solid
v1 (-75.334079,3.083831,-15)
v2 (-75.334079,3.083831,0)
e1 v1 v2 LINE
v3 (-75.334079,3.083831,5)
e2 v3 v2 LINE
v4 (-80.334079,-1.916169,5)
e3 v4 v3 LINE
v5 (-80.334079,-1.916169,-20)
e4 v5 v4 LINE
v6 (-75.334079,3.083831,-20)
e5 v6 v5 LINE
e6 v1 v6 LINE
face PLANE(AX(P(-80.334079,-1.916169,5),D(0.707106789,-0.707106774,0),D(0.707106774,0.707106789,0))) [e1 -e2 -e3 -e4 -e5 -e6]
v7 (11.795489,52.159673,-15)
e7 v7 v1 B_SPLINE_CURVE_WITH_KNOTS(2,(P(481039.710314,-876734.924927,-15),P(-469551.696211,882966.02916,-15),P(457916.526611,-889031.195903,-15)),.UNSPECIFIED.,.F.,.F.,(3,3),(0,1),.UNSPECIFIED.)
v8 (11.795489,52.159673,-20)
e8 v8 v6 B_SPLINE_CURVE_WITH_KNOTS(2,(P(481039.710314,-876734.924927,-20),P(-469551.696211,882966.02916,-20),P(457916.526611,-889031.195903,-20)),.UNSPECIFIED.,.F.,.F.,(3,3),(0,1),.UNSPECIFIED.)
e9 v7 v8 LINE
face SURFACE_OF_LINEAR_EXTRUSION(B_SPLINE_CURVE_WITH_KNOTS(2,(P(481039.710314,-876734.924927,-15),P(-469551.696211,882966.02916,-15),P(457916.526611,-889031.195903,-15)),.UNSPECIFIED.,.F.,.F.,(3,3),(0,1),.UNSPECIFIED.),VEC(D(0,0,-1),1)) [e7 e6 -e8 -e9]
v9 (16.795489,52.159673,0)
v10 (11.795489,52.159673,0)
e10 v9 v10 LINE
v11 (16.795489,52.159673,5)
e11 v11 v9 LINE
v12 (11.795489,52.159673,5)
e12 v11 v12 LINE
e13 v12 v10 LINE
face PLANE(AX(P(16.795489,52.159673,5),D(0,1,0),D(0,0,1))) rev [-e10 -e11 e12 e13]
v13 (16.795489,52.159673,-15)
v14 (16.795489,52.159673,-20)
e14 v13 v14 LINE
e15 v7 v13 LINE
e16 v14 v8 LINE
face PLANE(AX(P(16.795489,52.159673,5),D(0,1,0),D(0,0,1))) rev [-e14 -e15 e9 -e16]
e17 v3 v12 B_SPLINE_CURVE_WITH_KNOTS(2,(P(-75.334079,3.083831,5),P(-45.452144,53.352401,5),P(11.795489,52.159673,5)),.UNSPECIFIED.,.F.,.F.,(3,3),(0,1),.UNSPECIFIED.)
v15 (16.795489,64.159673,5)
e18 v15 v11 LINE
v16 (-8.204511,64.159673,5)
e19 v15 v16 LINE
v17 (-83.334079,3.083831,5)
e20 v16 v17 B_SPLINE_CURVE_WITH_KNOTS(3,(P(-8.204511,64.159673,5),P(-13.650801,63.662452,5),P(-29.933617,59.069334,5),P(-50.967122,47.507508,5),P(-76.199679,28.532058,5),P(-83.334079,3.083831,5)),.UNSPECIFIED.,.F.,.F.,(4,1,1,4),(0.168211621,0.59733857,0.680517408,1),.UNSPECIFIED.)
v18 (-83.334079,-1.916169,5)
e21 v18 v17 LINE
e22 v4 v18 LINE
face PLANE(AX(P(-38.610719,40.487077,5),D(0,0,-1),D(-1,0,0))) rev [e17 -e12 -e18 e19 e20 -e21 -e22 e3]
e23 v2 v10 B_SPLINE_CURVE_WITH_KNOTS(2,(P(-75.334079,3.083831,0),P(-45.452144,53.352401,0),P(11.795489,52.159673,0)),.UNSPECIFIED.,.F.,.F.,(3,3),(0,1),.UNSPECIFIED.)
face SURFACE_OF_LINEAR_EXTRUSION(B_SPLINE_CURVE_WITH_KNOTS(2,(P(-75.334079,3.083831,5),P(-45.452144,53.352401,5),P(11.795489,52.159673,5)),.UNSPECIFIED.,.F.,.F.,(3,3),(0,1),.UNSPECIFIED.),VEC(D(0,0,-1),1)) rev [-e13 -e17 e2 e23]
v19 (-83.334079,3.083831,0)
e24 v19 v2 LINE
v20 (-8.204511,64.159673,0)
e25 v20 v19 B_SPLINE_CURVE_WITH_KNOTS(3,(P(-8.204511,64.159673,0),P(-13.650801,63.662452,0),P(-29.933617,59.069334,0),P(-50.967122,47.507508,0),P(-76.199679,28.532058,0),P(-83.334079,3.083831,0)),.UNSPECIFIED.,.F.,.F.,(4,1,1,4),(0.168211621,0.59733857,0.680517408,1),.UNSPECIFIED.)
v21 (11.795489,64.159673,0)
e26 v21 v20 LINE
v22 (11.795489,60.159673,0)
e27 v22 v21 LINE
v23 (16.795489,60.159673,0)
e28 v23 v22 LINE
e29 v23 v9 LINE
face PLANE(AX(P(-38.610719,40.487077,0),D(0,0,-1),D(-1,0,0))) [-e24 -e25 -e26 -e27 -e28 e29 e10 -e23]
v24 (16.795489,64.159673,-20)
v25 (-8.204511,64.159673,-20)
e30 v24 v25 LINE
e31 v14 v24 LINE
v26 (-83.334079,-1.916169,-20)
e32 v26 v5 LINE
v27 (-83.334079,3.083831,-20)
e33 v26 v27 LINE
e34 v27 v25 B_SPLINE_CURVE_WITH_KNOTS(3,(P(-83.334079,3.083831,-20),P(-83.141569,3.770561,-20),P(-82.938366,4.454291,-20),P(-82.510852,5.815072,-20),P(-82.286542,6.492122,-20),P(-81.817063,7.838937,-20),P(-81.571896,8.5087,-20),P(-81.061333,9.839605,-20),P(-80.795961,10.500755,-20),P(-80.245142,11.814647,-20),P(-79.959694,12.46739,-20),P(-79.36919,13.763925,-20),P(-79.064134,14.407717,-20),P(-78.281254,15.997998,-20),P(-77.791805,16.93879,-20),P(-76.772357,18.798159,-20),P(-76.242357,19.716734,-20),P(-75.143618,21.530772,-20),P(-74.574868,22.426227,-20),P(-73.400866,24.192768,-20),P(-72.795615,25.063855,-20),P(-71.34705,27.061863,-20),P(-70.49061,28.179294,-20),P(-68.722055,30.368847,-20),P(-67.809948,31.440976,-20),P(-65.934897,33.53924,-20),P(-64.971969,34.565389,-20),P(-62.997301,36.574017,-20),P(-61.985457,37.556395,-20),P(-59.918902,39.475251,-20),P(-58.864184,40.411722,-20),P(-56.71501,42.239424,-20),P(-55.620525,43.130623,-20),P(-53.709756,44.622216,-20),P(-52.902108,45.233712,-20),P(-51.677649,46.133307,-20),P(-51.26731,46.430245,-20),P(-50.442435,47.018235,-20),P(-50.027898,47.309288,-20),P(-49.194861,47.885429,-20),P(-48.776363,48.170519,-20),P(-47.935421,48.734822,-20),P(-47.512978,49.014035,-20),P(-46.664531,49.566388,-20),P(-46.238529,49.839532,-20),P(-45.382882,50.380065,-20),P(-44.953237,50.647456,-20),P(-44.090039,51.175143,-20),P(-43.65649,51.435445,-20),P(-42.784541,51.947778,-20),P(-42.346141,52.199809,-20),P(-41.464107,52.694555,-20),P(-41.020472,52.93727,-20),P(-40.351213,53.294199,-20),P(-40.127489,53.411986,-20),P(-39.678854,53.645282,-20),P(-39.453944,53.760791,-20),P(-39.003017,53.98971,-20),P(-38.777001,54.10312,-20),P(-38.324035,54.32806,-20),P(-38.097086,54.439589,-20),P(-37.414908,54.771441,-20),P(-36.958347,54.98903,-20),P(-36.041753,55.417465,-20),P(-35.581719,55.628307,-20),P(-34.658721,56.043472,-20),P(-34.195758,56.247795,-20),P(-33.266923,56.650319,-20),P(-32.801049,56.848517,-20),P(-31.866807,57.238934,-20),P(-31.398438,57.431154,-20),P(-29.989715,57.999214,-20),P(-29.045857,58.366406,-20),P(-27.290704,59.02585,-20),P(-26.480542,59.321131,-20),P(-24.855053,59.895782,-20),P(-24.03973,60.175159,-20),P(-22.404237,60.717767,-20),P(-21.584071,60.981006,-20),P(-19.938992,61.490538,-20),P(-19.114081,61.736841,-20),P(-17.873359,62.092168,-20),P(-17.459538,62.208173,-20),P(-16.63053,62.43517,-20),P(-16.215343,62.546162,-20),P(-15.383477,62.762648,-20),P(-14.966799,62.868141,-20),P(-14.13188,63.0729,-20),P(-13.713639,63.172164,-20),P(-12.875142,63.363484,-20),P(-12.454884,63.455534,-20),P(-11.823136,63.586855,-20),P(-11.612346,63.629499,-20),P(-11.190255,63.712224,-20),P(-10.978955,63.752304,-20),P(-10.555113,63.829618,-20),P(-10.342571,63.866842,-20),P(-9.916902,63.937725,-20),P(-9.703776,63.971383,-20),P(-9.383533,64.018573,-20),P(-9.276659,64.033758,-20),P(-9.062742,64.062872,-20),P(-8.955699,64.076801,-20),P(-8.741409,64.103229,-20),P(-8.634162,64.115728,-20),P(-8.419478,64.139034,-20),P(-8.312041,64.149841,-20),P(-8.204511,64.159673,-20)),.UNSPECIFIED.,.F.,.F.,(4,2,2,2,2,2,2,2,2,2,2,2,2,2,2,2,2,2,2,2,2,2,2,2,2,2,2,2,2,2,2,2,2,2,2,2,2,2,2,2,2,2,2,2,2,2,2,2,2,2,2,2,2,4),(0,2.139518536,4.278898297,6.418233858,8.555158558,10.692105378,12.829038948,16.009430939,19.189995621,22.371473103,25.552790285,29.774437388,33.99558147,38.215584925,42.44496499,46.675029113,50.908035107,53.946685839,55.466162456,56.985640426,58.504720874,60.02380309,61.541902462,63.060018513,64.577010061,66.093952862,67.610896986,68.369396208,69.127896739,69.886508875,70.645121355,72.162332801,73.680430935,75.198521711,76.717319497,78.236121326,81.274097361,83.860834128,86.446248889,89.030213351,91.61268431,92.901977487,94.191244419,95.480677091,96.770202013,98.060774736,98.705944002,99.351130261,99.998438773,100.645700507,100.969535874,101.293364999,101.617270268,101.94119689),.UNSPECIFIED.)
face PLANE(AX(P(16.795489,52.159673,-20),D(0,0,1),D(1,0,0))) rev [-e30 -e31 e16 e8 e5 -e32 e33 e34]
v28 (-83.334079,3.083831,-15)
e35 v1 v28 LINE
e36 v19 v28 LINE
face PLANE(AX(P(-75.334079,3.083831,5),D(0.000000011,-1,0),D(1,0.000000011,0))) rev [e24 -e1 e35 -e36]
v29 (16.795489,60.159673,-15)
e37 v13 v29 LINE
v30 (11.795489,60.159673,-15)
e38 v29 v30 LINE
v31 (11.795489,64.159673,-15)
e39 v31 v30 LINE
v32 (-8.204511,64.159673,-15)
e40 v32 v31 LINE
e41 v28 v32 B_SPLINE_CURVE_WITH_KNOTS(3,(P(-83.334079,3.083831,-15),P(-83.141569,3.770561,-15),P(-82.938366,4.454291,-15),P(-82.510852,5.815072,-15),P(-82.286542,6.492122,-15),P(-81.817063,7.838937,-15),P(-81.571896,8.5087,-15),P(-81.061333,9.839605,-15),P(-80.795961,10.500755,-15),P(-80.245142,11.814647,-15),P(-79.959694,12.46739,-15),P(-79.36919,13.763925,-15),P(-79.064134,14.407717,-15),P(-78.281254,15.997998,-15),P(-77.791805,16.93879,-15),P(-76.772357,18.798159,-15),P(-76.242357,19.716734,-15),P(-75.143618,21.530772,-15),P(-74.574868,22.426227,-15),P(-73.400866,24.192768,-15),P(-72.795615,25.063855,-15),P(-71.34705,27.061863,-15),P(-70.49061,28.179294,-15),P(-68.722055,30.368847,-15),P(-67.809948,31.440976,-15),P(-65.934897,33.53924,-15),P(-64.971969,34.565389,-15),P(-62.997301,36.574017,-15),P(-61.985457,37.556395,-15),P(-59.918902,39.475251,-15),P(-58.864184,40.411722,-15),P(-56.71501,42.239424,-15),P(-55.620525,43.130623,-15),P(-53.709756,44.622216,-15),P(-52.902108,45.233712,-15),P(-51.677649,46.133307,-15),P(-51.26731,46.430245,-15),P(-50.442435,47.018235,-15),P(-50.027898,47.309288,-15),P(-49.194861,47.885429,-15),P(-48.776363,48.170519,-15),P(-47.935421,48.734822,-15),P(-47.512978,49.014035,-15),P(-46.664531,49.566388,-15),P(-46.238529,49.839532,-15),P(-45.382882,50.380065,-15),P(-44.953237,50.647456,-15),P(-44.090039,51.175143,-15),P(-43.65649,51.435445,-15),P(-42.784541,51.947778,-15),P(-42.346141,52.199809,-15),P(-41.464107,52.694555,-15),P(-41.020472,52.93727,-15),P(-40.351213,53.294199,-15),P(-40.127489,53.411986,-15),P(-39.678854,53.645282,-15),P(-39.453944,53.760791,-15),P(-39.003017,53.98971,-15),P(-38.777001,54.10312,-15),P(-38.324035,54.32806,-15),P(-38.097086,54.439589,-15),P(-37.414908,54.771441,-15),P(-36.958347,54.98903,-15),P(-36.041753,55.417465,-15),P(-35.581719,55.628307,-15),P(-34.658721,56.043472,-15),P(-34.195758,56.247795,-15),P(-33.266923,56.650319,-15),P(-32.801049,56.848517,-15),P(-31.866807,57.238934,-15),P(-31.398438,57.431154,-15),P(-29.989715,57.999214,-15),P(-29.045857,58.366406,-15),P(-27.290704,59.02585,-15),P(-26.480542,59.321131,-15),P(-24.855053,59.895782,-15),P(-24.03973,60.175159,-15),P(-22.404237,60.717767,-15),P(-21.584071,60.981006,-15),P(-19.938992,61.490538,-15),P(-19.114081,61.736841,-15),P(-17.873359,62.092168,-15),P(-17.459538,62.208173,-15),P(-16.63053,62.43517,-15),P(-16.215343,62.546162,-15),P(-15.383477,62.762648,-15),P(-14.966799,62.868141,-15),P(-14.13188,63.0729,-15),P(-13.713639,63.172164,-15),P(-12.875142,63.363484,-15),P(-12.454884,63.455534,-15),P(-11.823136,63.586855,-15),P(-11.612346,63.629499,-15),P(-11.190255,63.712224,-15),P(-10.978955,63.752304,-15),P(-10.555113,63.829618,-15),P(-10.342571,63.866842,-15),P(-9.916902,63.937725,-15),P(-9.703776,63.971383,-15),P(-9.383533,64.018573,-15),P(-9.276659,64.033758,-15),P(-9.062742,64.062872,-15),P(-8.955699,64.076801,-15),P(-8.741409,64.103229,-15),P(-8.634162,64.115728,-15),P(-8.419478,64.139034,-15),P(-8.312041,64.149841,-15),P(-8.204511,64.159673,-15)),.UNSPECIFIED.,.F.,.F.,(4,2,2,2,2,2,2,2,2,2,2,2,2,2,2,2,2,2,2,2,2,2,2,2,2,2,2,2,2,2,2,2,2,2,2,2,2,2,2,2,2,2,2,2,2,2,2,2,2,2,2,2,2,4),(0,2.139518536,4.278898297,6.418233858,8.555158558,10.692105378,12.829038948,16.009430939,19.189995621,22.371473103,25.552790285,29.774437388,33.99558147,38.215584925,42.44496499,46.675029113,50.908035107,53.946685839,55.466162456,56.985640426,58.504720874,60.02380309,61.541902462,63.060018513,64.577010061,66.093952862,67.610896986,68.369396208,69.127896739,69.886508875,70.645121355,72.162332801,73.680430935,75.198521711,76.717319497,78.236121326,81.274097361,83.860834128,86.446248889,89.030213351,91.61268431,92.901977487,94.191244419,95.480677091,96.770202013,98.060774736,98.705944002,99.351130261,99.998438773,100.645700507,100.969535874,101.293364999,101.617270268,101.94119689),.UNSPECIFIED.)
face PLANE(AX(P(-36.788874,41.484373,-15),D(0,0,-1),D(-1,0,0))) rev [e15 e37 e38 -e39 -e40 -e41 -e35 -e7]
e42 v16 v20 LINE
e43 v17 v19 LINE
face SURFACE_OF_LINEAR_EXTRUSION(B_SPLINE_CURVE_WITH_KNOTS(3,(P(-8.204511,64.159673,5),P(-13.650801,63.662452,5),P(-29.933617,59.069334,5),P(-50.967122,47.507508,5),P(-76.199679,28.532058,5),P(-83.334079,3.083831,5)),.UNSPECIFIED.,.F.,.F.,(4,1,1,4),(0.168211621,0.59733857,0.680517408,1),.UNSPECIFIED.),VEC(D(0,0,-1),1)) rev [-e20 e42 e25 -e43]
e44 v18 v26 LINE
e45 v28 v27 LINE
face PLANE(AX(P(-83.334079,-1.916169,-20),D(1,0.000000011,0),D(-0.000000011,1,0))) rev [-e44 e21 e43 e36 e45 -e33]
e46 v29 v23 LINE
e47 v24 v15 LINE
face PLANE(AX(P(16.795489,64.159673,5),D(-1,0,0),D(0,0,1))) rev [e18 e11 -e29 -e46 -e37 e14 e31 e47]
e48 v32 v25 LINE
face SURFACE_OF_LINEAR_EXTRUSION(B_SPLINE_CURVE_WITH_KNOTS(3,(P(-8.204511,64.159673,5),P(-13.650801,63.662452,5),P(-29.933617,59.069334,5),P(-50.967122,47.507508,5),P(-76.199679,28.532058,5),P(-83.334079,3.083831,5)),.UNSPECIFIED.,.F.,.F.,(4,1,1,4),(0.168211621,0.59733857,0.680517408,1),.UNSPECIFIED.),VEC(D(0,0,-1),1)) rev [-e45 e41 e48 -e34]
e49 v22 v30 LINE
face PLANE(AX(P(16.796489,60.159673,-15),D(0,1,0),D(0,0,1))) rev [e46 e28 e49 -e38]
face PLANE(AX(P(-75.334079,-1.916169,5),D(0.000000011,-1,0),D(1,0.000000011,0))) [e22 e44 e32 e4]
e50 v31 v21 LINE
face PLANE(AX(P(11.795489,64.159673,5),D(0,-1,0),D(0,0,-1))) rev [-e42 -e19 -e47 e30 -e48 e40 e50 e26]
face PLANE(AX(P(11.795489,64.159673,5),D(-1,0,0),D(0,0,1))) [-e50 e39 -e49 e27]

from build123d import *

# Parameters (mm, degrees)
Y_KSEKLIK_EKSTR_ZYON1_DEPTH = 5
IZIM2_W                     = 25
IZIM2_H                     = 12
Y_KSEKLIK_EKSTR_ZYON2_DEPTH = 5
Y_KSEKLIK_EKSTR_ZYON3_DEPTH = 5
IZIM4_W                     = 8.00000005
IZIM4_H                     = 25
Y_KSEKLIK_EKSTR_ZYON4_DEPTH = 5
PAH1_SIZE                   = 5
KES_EKSTR_ZYON1_REACH       = 118.474
IZIM5_W                     = 15
IZIM5_H                     = 11.42641292


with BuildPart() as part:
    # Çizim1 → Yükseklik-Ekstrüzyon1 (new body)
    with BuildSketch(Plane.XY):
        with BuildLine():
            Line((11.795489464, 52.159673173), (11.795489464, 59.159673173))
            Line((11.795489464, 59.159673173), (11.795489464, 64.159673173))
            Line((11.795489464, 64.159673173), (-8.204510536, 64.159673173))
            add(Edge.make_bspline(
                [(-8.204510536, 64.159673173), (-13.650800552, 63.66245189), (-29.933617008, 59.069334228), (-50.967122345, 47.507508093), (-76.199679343, 28.532057851), (-83.334078998, 3.083830852)],
                knots=[0.168211621, 0.168211621, 0.168211621, 0.168211621, 0.59733857, 0.680517408, 1, 1, 1, 1], degree=3))
            Line((-83.334078998, 3.083830852), (-75.334078998, 3.083830852))
            add(Edge.make_bspline(
                [(11.795489464, 52.159673173), (-45.452144083, 53.352401488), (-75.334078998, 3.083830852)],
                knots=[0, 0, 0, 1, 1, 1], degree=2))
        make_face()
    extrude(amount=Y_KSEKLIK_EKSTR_ZYON1_DEPTH)

    # Çizim2 → Yükseklik-Ekstrüzyon2 (add)
    with BuildSketch(Plane(origin=(11.795489464, 0, 0), x_dir=(0, 0, -1), z_dir=(1, 0, 0))):
        with Locations((7.5, 58.159673173)):
            Rectangle(IZIM2_W, IZIM2_H)
    extrude(amount=Y_KSEKLIK_EKSTR_ZYON2_DEPTH)

    # Çizim3 → Yükseklik-Ekstrüzyon3 (add)
    with BuildSketch(Plane(origin=(0, 0, -20), x_dir=(-1, 0, 0), z_dir=(0, 0, -1))):
        with BuildLine():
            Line((75.334078948, 3.083830937), (83.334078998, 3.083830852))
            add(Edge.make_bspline(
                [(83.334078998, 3.083830852), (76.199679343, 28.532057851), (50.967122345, 47.507508093), (29.933617008, 59.069334228), (13.650800552, 63.66245189), (8.204510536, 64.159673173)],
                knots=[0.168211621, 0.168211621, 0.168211621, 0.168211621, 0.487694213, 0.570873051, 1, 1, 1, 1], degree=3))
            Line((8.204510536, 64.159673173), (-11.795489464, 64.159673173))
            Line((-11.795489464, 64.159673173), (-11.795489464, 52.159673173))
            add(Edge.make_bspline(
                [(-11.795489464, 52.159673173), (45.452144035, 53.352401487), (75.334078948, 3.083830937)],
                knots=[0, 0, 0, 1, 1, 1], degree=2))
        make_face()
    extrude(amount=-Y_KSEKLIK_EKSTR_ZYON3_DEPTH)

    # Çizim4 → Yükseklik-Ekstrüzyon4 (add)
    with BuildSketch(Plane(origin=(-3.3e-08, 3.08383174, 0), x_dir=(1.0, 1.0658518704879855e-08, 0), z_dir=(1.0658518704879855e-08, -1.0, 0))):
        with Locations((-79.33407894, -7.5)):
            Rectangle(IZIM4_W, IZIM4_H)
    extrude(amount=Y_KSEKLIK_EKSTR_ZYON4_DEPTH)

    # Pah1
    pah1_edges = [part.edges().sort_by_distance(p)[0] for p in [
        (-75.334078894, -1.916169063, -7.5),
    ]]
    chamfer(pah1_edges, length=PAH1_SIZE - 0.0001)  # a hair under: the kernel refuses the full size

    # Çizim5 → Kes-Ekstrüzyon1 (cut, up to next)
    with BuildSketch(Plane.ZY.offset(-11.795489464), mode=Mode.PRIVATE) as kes_ekstr_zyon1_sk1:
        with Locations((-7.5, 54.446466713)):
            Rectangle(IZIM5_W, IZIM5_H)
    kes_ekstr_zyon1_tool1 = extrude(kes_ekstr_zyon1_sk1.sketch, amount=-KES_EKSTR_ZYON1_REACH, mode=Mode.PRIVATE) & part.part
    add(kes_ekstr_zyon1_tool1.solids().sort_by_distance((11.795489, 54.446467, -7.5))[0], mode=Mode.SUBTRACT)


solid = part.part
